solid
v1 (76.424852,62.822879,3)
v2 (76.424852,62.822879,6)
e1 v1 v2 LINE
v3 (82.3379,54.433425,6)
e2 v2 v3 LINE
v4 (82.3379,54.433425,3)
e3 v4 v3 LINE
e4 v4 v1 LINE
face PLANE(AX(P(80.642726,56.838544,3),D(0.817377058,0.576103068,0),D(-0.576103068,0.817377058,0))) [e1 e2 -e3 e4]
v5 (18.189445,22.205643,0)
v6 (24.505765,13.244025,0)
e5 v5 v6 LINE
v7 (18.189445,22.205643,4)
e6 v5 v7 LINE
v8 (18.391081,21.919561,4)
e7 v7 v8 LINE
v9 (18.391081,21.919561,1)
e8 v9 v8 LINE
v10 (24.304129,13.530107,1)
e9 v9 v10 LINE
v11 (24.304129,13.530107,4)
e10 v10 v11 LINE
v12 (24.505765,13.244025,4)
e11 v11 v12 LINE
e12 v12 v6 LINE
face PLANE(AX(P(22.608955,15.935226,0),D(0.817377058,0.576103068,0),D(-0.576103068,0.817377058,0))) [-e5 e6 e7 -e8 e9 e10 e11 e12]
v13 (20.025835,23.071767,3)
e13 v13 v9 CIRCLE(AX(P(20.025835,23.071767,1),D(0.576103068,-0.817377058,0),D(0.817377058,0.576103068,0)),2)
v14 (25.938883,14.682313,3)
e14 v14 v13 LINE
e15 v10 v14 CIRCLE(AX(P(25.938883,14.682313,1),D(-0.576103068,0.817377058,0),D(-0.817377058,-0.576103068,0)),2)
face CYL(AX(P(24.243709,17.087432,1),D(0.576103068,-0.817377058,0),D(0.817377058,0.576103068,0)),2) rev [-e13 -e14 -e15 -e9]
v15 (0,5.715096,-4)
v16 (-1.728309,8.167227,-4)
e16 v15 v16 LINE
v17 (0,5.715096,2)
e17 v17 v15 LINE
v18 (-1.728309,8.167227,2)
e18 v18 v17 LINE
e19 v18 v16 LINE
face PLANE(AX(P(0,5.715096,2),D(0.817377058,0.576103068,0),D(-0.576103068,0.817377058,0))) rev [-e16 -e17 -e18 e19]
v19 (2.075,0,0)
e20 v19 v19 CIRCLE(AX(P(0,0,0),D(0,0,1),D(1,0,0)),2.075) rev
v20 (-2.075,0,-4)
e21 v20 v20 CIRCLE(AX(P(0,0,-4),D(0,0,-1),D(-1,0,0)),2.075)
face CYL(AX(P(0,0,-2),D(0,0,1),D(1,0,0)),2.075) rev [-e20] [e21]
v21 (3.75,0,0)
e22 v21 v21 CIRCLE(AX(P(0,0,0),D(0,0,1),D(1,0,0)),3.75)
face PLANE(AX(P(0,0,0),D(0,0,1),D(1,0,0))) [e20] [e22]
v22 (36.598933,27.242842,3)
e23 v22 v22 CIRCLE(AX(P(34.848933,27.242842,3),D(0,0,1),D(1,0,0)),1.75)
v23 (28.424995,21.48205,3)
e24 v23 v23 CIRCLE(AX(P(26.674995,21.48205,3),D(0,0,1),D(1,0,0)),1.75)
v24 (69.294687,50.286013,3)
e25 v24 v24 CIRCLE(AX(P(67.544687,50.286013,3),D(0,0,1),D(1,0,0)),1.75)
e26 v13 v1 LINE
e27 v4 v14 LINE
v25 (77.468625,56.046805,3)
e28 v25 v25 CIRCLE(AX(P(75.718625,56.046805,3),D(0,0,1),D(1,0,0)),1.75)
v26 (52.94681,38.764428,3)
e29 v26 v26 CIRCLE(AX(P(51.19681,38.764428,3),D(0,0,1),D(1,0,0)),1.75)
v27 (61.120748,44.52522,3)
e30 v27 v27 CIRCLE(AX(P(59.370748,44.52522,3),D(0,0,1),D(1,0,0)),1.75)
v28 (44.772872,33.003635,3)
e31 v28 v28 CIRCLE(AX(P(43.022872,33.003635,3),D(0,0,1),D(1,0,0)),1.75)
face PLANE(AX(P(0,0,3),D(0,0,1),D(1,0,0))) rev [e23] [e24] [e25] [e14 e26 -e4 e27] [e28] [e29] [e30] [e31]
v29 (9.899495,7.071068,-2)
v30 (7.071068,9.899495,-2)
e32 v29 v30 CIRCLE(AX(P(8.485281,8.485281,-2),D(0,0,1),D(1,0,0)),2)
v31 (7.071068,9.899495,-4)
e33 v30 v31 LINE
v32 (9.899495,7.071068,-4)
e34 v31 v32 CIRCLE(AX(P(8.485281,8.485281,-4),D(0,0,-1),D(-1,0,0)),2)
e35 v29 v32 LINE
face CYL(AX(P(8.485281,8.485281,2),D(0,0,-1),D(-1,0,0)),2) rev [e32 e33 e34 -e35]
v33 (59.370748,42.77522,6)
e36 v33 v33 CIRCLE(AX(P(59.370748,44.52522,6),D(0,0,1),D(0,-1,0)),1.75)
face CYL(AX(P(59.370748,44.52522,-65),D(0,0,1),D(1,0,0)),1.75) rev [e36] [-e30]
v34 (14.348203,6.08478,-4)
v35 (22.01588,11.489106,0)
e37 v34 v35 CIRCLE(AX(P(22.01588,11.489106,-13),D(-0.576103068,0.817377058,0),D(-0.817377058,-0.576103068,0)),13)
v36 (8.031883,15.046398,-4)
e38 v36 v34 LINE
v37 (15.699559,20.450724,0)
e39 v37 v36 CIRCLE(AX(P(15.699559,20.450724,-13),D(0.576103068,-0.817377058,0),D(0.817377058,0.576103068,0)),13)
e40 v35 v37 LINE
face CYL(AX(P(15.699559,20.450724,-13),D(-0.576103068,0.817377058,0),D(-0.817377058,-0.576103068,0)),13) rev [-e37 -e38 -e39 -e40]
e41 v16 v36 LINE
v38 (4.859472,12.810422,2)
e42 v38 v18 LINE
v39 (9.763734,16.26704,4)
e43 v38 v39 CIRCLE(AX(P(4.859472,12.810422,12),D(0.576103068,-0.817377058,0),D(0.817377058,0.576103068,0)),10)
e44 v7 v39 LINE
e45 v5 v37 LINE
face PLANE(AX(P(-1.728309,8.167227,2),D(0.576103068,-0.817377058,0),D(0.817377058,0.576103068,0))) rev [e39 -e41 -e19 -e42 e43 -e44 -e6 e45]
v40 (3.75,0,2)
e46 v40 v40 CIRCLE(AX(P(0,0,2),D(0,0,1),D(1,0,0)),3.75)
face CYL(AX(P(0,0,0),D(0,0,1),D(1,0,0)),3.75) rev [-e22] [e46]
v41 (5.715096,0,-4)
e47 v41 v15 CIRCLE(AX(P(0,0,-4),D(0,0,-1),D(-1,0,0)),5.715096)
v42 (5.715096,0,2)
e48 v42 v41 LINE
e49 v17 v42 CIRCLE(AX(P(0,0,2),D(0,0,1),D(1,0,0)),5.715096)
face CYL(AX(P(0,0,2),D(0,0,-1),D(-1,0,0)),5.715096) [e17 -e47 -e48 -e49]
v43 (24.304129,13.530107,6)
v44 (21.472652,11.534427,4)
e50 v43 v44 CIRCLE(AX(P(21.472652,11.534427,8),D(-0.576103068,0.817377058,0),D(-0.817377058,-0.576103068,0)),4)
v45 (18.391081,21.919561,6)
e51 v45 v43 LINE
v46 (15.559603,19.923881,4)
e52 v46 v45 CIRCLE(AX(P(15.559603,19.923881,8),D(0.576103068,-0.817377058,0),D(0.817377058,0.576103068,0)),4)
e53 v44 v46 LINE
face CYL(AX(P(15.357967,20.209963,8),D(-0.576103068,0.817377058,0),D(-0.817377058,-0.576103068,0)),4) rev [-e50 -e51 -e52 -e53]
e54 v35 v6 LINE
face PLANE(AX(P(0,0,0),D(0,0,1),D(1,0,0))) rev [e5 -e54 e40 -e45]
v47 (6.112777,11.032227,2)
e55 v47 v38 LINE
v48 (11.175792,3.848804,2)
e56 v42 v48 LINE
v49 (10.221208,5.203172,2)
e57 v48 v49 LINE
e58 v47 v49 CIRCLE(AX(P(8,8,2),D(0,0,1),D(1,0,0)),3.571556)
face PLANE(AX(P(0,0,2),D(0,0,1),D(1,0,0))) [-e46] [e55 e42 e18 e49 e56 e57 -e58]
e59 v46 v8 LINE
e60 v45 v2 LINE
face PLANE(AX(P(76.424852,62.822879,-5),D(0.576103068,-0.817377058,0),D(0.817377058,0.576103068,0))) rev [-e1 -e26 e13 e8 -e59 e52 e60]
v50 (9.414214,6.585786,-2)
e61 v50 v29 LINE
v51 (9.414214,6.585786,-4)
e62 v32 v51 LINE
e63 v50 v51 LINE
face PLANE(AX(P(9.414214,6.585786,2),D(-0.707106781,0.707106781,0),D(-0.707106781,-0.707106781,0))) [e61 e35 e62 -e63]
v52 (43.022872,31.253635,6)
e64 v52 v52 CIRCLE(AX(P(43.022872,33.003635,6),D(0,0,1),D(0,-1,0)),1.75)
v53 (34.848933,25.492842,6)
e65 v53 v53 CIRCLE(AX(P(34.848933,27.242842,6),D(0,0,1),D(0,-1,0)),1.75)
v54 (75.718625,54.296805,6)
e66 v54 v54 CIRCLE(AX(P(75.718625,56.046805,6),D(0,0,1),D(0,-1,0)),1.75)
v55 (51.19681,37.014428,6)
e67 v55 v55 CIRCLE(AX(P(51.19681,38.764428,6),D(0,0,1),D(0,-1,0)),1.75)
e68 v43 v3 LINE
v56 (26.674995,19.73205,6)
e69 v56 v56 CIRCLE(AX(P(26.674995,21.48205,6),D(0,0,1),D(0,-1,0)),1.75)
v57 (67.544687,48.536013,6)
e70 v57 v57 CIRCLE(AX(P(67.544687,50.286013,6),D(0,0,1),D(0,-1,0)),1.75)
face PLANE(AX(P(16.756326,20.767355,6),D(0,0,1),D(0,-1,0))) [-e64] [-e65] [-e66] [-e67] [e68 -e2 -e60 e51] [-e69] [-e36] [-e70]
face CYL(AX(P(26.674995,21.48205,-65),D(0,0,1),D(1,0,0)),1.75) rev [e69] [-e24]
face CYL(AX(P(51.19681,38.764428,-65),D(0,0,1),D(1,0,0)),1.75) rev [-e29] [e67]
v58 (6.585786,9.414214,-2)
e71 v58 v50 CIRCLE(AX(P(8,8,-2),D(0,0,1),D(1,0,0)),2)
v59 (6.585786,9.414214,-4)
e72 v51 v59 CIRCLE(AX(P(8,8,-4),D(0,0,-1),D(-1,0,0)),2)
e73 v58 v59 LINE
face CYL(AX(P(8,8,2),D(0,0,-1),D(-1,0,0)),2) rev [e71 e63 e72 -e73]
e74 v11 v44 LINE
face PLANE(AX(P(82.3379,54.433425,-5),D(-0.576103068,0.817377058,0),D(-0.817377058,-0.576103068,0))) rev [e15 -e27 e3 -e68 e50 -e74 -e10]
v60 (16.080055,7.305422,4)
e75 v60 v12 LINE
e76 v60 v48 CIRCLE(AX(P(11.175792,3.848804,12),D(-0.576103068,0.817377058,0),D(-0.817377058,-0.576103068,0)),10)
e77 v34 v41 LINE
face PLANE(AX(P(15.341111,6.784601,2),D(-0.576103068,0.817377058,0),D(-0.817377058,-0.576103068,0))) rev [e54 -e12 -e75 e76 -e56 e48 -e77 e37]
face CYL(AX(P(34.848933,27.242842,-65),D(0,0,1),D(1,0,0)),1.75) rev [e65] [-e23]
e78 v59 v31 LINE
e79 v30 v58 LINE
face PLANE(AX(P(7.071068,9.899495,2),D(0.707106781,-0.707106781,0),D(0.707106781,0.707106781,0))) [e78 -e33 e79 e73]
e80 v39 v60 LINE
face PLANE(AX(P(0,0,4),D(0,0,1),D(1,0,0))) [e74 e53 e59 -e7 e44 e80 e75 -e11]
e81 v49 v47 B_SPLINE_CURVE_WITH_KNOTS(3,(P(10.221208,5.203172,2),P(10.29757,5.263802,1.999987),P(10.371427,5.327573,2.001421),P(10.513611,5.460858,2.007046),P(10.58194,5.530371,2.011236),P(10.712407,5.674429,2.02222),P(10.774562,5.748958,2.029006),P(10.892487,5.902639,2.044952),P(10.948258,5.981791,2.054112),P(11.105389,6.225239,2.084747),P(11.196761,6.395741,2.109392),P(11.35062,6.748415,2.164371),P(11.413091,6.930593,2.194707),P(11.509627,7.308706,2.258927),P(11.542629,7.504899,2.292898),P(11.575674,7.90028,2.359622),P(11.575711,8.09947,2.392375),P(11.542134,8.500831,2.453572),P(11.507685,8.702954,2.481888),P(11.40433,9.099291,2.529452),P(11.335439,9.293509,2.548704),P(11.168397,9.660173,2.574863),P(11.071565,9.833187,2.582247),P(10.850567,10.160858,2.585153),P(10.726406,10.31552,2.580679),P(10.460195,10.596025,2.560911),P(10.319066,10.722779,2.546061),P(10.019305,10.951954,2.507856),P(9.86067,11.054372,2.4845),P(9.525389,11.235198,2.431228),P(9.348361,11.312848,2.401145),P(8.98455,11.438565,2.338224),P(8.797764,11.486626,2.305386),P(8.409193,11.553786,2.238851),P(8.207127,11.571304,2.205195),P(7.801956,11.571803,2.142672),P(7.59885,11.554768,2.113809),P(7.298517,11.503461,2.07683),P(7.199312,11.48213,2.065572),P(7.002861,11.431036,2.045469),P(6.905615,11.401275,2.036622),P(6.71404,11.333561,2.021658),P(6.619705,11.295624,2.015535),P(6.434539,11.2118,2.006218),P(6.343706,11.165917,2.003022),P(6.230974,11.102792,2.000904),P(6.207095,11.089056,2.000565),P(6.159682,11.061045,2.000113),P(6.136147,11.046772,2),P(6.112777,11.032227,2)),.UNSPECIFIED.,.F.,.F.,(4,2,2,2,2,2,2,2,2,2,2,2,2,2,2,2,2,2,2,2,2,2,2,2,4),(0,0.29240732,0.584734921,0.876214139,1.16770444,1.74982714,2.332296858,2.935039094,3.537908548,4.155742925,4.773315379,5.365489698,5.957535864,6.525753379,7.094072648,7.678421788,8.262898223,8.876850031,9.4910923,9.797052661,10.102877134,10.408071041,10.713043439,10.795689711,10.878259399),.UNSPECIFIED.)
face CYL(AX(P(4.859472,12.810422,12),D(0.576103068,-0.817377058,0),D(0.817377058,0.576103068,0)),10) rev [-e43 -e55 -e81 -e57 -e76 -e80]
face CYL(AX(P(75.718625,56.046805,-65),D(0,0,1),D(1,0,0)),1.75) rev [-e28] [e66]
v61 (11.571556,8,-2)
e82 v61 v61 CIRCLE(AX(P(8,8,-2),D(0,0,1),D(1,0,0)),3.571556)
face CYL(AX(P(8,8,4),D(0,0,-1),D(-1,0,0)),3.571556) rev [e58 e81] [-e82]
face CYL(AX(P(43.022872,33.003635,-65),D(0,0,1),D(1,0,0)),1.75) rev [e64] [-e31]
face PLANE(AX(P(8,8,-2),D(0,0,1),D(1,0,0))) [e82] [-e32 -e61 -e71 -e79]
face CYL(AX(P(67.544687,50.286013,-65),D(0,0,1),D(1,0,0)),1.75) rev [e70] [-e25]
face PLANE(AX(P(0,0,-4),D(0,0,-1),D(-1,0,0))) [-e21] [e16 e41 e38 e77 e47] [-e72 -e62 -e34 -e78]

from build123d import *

# Parameters (mm, degrees)
SKETCH_1_R                     = 2.1
EXTRUDE_1_DEPTH                = 2
EXTRUDE_2_DEPTH                = 40
EXTRUDE_3_DEPTH                = 2
EXTRUDE_START                  = -4
SKETCH_10_R                    = 2.075
EXTRUDE_4_DEPTH                = 4
SKETCH_14_R                    = 3.5715559825460215
CUT_EXTRUDE_6_DEPTH            = 4
EXTRUDE_5_DEPTH                = 2
EXTRUDE_START_2                = 2
SKETCH_19_R                    = 2.075
EXTRUDE_6_DEPTH                = 2
CUT_EXTRUDE_START              = -2
SKETCH_22_R                    = 3.5715559825460206
CUT_EXTRUDE_11_DEPTH           = 2
SKETCH_23_R                    = 3.75
CUT_EXTRUDE_12_DEPTH           = 2
FILLET_5_R                     = 13
FILLET_6_R                     = 10
CUT_EXTRUDE_13_DEPTH           = 28.999999999999996
CUT_EXTRUDE_14_DEPTH           = 12.999999999999984
SKETCH_29_R                    = 3.0000000000000084
SKETCH_29_R_2                  = 3.0000000000000018
SKETCH_29_R_3                  = 1.2000000000000004
EXTRUDE_8_DEPTH                = 13
CUT_EXTRUDE_15_DEPTH           = 13
M3X0_5_1_D                     = 2.8
FILLET_8_R                     = 5
EXTRUDE_9_DEPTH                = 1.9999999999999991
EXTRUDE_10_DEPTH               = 4.5
EXTRUDE_11_DEPTH               = 0.5
FILLET_9_R                     = 0.5
CUT_EXTRUDE_16_DEPTH           = 9.500000000000002
EXTRUDE_12_DEPTH               = 2
CUT_EXTRUDE_17_DEPTH           = 50.00000000000002
SKETCH_42_W                    = 39.21300819263915
SKETCH_42_H                    = 42.57339221101679
CUT_EXTRUDE_19_DEPTH           = 50.00000000000002
SKETCH_44_W                    = 3.999999999999999
SKETCH_44_H                    = 10.963872604458988
EXTRUDE_13_DEPTH               = 60.00000000000003
SKETCH_45_W                    = 1.9999999999999996
SKETCH_45_H                    = 10.963872604458988
CUT_EXTRUDE_20_DEPTH           = 73.00000000000004
SKETCH_46_R                    = 1.7500000000000004
SKETCH_46_R_2                  = 1.7500000000000038
SKETCH_46_R_3                  = 1.749999999999997
SKETCH_46_R_4                  = 1.7500000000000104
CUT_EXTRUDE_21_DEPTH           = 70.00000000000003
SKETCH_47_W                    = 1.9999999999999996
SKETCH_47_H                    = 10.963872604458988
CUT_EXTRUDE_22_DEPTH           = 1.9999999999999967
CUT_EXTRUDE_23_DEPTH           = 10
EXTRUDE_16_DEPTH               = 73.00000000000003
SKETCH_52_R                    = 1.7500000000000104
SKETCH_52_R_2                  = 1.749999999999997
SKETCH_52_R_3                  = 1.7500000000000038
SKETCH_52_R_4                  = 1.7500000000000004
CUT_EXTRUDE_24_DEPTH           = 73.00000000000003
SPLIT_BODIES_1_SURFACE_1_BACK  = 112.869
SPLIT_BODIES_1_SURFACE_1_DEPTH = 225.738
SPLIT_BODIES_1_SURFACE_2_BACK  = 112.869
SPLIT_BODIES_1_SURFACE_2_DEPTH = 225.738
FILLET_11_R                    = 2
FILLET_12_R                    = 4


# Read off the part's stored shape, not the designer's step: 实体-删除/保留 1
with BuildPart() as part:
    # 草图1 → 凸台-拉伸1 (new body)
    with BuildSketch(Plane.XY):
        with BuildLine():
            Line((5.715095935783956, 0), (15.341111112939824, 6.784600591097247))
            Line((15.341111112939824, 6.784600591097247), (42.49706355926069, 25.92463804463833))
            Line((42.49706355926069, 25.92463804463833), (52.86691877711603, 11.211850995247643))
            Line((52.86691877711603, 11.211850995247643), (93.73577169209018, 40.017004378179195))
            Line((93.73577169209018, 40.017004378179195), (42.483411773869754, 112.7340328625418))
            Line((42.483411773869754, 112.7340328625418), (1.6145588588956372, 83.92887947961026))
            Line((1.6145588588956372, 83.92887947961026), (36.18074291841349, 34.88625598164134))
            Line((36.18074291841349, 34.88625598164134), (-1.7283092029758853, 8.167227110682408))
            Line((-1.7283092029758853, 8.167227110682408), (0, 5.715095935783956))
            ThreePointArc((0, 5.715095935783956), (-4.0411830913245135, -4.041183091324513), (5.715095935783956, 0))
        make_face()
        Circle(SKETCH_1_R, mode=Mode.SUBTRACT)
        with BuildLine():
            Line((7.071067811864017, 9.899494936610912), (6.585786437625429, 9.414213562372302))
            ThreePointArc((6.585786437625429, 9.414213562372302), (6.585786437625458, 6.585786437626118), (9.41421356237164, 6.58578643762615))
            Line((9.41421356237164, 6.58578643762615), (9.899494936610207, 7.071067811864724))
            ThreePointArc((9.899494936610207, 7.071067811864724), (9.899494936610207, 9.899494936610912), (7.071067811864017, 9.899494936610912))
        make_face(mode=Mode.SUBTRACT)
    extrude(amount=EXTRUDE_1_DEPTH)

    # 草图2 → 凸台-拉伸2 (add)
    with BuildSketch(Plane.XY.offset(2)):
        Polygon((2.4787134603835828, 82.70281389216105), (42.12150078790845, 110.64381267360466), (91.64555150315304, 40.37891536414052), (52.00276417562808, 12.43791658269687), (52.86691877711603, 11.211850995247648), (93.73577169209018, 40.017004378179195), (42.483411773869754, 112.7340328625418), (1.6145588588956372, 83.92887947961026), align=None)
    extrude(amount=EXTRUDE_2_DEPTH)

    # 草图4 → 凸台-拉伸3 (add)
    with BuildSketch(Plane.XY.offset(42)):
        Polygon((93.73577169209018, 40.017004378179195), (52.86691877711603, 11.211850995247648), (1.6145588588956372, 83.92887947961026), (42.483411773869754, 112.7340328625418), align=None)
    extrude(amount=EXTRUDE_3_DEPTH)

    # 草图10 → 凸台-拉伸4 (add)
    with BuildSketch(Plane.XY.offset(2).offset(EXTRUDE_START)):
        with BuildLine():
            Line((8.031882820422537, 15.046398123036559), (14.348203461269724, 6.084780186033628))
            Line((14.348203461269724, 6.084780186033628), (5.715095935783956, 0))
            ThreePointArc((5.715095935783956, 0), (-4.0411830913245135, -4.041183091324513), (0, 5.715095935783956))
            Line((0, 5.715095935783956), (-1.7283092029758853, 8.167227110682408))
            Line((-1.7283092029758853, 8.167227110682408), (8.031882820422537, 15.046398123036559))
        make_face()
        Circle(SKETCH_10_R, mode=Mode.SUBTRACT)
        with BuildLine():
            Line((7.071067811864017, 9.899494936610912), (6.58578643762543, 9.4142135623723))
            ThreePointArc((6.58578643762543, 9.4142135623723), (6.585786437625461, 6.585786437626118), (9.414213562371643, 6.58578643762615))
            Line((9.414213562371643, 6.58578643762615), (9.899494936610205, 7.071067811864723))
            ThreePointArc((9.899494936610205, 7.071067811864723), (9.899494936610207, 9.899494936610912), (7.071067811864017, 9.899494936610912))
        make_face(mode=Mode.SUBTRACT)
    extrude(amount=EXTRUDE_4_DEPTH)

    # 草图14 → 切除-拉伸6 (cut)
    with BuildSketch(Plane(origin=(0, 0, 0), x_dir=(-1, 0, 0), z_dir=(0, 0, -1))):
        with Locations((-7.999999999998536, 7.999999999999225)):
            Circle(SKETCH_14_R)
    extrude(amount=-CUT_EXTRUDE_6_DEPTH, mode=Mode.SUBTRACT)

    # 草图17 → 凸台-拉伸5 (add)
    with BuildSketch(Plane.XY.offset(2)):
        Polygon((9.763733946874806, 16.267040097932394), (16.080054587722028, 7.305422160929461), (83.36591647423481, 54.72979142756991), (77.0495958333876, 63.691409364572834), align=None)
    extrude(amount=EXTRUDE_5_DEPTH)

    # 草图19 → 凸台-拉伸6 (add)
    with BuildSketch(Plane(origin=(0, 0, -2), x_dir=(-1, 0, 0), z_dir=(0, 0, -1)).offset(EXTRUDE_START_2)):
        with BuildLine():
            Line((1.7283092029758853, 8.167227110682408), (-8.031882820422537, 15.046398123036559))
            Line((-8.031882820422537, 15.046398123036559), (-14.348203461269724, 6.084780186033628))
            Line((-14.348203461269724, 6.084780186033628), (-5.715095935783956, 0))
            ThreePointArc((-5.715095935783956, 0), (4.041183091324512, -4.0411830913245135), (3.5e-16, 5.715095935783956))
            Line((3.5e-16, 5.715095935783956), (1.7283092029758853, 8.167227110682408))
        make_face()
        with Locations(Location((0, 0, 0), (0, 0, 180))):
            Circle(SKETCH_19_R, mode=Mode.SUBTRACT)
        with BuildLine():
            Line((-9.414213562371643, 6.58578643762615), (-9.899494936610205, 7.071067811864723))
            ThreePointArc((-9.899494936610205, 7.071067811864723), (-9.899494936610207, 9.899494936610914), (-7.071067811864017, 9.899494936610912))
            Line((-7.071067811864017, 9.899494936610912), (-6.58578643762543, 9.4142135623723))
            ThreePointArc((-6.58578643762543, 9.4142135623723), (-6.585786437625462, 6.585786437626118), (-9.414213562371643, 6.58578643762615))
        make_face(mode=Mode.SUBTRACT)
    extrude(amount=-EXTRUDE_6_DEPTH)

    # 草图22 → 切除-拉伸11 (cut)
    with BuildSketch(Plane.XY.offset(CUT_EXTRUDE_START)):
        with Locations((7.999999999998536, 7.999999999999225)):
            Circle(SKETCH_22_R)
    extrude(amount=CUT_EXTRUDE_11_DEPTH, mode=Mode.SUBTRACT)

    # 草图23 → 切除-拉伸12 (cut)
    with BuildSketch(Plane.XY.offset(2)):
        Circle(SKETCH_23_R)
    extrude(amount=-CUT_EXTRUDE_12_DEPTH, mode=Mode.SUBTRACT)

    # 圆角5
    # the kernel refuses this fillet: 13 mm, written as the material it adds along each edge
    with BuildSketch(Plane(origin=(14.348203461269723, 6.084780186033624, 2.2e-16), x_dir=(8e-16, 5.7e-16, -1), z_dir=(-0.5761030676586291, 0.8173770582994835, 0))) as fillet_5_piece_1:
        with BuildLine():
            CenterArc((13.000000000000009, -9.38083151964685), FILLET_5_R, 133.81306146040322, 46.18693853959684)
            Line((9.43e-15, -9.380831519646863), (-0.25999999999999057, -9.380831519646863))
            Line((-0.25999999999999057, -9.380831519646863), (-0.26, 3.4e-16))
            Line((-0.26, 3.4e-16), (-2.6e-16, 0.26000000000000023))
            ThreePointArc((-2.6e-16, 0.26000000000000023), (1.9999999999999998, 0.2599999999999987), (3.8200000000000003, 0.1876166303929368))
            Line((3.8200000000000003, 0.1876166303929368), (4, 0))
        make_face()
    extrude(amount=10.963872604458924)

    # 圆角6
    # the kernel refuses this fillet: 10 mm, written as the material it adds along each edge
    with BuildSketch(Plane(origin=(9.763733946874806, 16.267040097932394, 2), x_dir=(-0.8173770582994822, -0.5761030676586308, 0), z_dir=(0.576103067658631, -0.8173770582994822, 0))) as fillet_6_piece_1_section:
        with BuildLine():
            CenterArc((6.000000000000636, -10.000000000000002), FILLET_6_R, 90, 36.86989764584695)
            Line((2.2818e-13, -2.000000000000304), (-0.11999999999977938, -1.8400000000003103))
            ThreePointArc((-0.11999999999977938, -1.8400000000003103), (-0.20000000000000048, -1.000000000000152), (-0.20000000000000048, 0))
            Line((-0.20000000000000048, 0), (-1.45e-15, 0.2))
            Line((-1.45e-15, 0.2), (6.000000000000636, 0.2))
            Line((6.000000000000636, 0.2), (6.000000000000636, 0))
        make_face()
    fillet_6_piece_1 = extrude(amount=10.963872604458947, mode=Mode.PRIVATE)
    fillet_6_piece_1 = fillet_6_piece_1 - Plane(origin=(7.999999999998536, 7.999999999999225, 2), x_dir=(-1, 0, 0), z_dir=(0, 0, -1)) * Cylinder(3.5715559825460215, 46, mode=Mode.PRIVATE)
    add(fillet_6_piece_1)

    # 草图24 → 切除-拉伸13 (cut)
    with BuildSketch(Plane.XY.offset(44.00000000000001)):
        Polygon((1.6145588588956372, 83.92887947961026), (42.483411773869754, 112.7340328625418), (93.73577169209018, 40.017004378179195), (52.86691877711603, 11.211850995247648), (2.4787134603835828, 82.70281389216105), align=None)
    extrude(amount=-CUT_EXTRUDE_13_DEPTH, mode=Mode.SUBTRACT)

    # 草图25 → 切除-拉伸14 (cut)
    with BuildSketch(Plane.XY.offset(15.000000000000007)):
        Polygon((2.4787134603835828, 82.70281389216105), (1.6145588588956372, 83.92887947961026), (42.48341177386975, 112.7340328625418), (93.73577169209018, 40.017004378179195), (52.86691877711603, 11.211850995247648), (52.00276417562802, 12.437916582696838), (91.64555150315304, 40.37891536414052), (42.12150078790842, 110.64381267360463), align=None)
    extrude(amount=-CUT_EXTRUDE_14_DEPTH, mode=Mode.SUBTRACT)

    # 草图29 → 凸台-拉伸8 (add)
    with BuildSketch(Plane.XY.offset(2)):
        with Locations(Location((86.76837106229962, 41.223374331383454, 0), (0, 0, 180))):
            Circle(SKETCH_29_R)
        with Locations(Location((51.2228117877621, 91.65553882846152, 0), (0, 0, 180))):
            Circle(SKETCH_29_R_2)
        with Locations(Location((35.247091362615166, 45.46860572527032, 0), (0, 0, 180))):
            Circle(SKETCH_29_R_3)
    extrude(amount=EXTRUDE_8_DEPTH)

    # 草图30 → 切除-拉伸15 (cut)
    with BuildSketch(Plane.XY.offset(2)):
        Polygon((1.6145588588956372, 83.92887947961026), (42.48341177386975, 112.7340328625418), (53.29333634245431, 97.39687387080285), (12.424483427480185, 68.59172048787134), align=None)
    extrude(amount=-CUT_EXTRUDE_15_DEPTH, mode=Mode.SUBTRACT)

    # M3x0.5 螺纹孔1 (through all)
    with Locations(Plane.XY.offset(15)):
        with Locations((51.222811788, 91.655538828), (86.768371062, 41.223374331)):
            Hole(M3X0_5_1_D / 2)

    # 圆角8
    # the kernel refuses this fillet: 5 mm, written as the material it takes off along each edge
    with BuildSketch(Plane(origin=(52.86691877711603, 11.21185099524764, -12.500000000000018), x_dir=(-0.57610306765863, 0.8173770582994827, 0), z_dir=(0, 1.2e-16, 1))) as fillet_8_piece_1:
        with BuildLine():
            CenterArc((FILLET_8_R, -FILLET_8_R), FILLET_8_R, 90.00000000000001, 90.00000000000011)
            Line((4.76e-15, -FILLET_8_R), (0, 0))
            Line((0, 0), (FILLET_8_R, 1e-17))
        make_face()
    extrude(amount=27.000000000000057, mode=Mode.SUBTRACT)
    with BuildSketch(Plane(origin=(93.73577169209018, 40.017004378179195, -12.499999999999993), x_dir=(-0.8173770582994824, -0.5761030676586305, 0), z_dir=(0, 0, 1))) as fillet_8_piece_2:
        with BuildLine():
            CenterArc((FILLET_8_R, -FILLET_8_R), FILLET_8_R, 90, 90)
            Line((-5.2e-16, -FILLET_8_R), (0, 0))
            Line((0, 0), (FILLET_8_R, -2.3e-16))
        make_face()
    extrude(amount=27.000000000000007, mode=Mode.SUBTRACT)
    with BuildSketch(Plane(origin=(12.424483427480185, 68.59172048787134, 14.499999999999991), x_dir=(0.5761030676586302, -0.8173770582994826, 0), z_dir=(0, 0, -1))) as fillet_8_piece_3:
        with BuildLine():
            CenterArc((FILLET_8_R, -FILLET_8_R), FILLET_8_R, 90, 89.99999999999989)
            Line((-6.63e-15, -FILLET_8_R), (0, 0))
            Line((0, 0), (FILLET_8_R, -4e-16))
        make_face()
    extrude(amount=26.999999999999982, mode=Mode.SUBTRACT)
    with BuildSketch(Plane(origin=(53.29333634245431, 97.39687387080285, 14.499999999999993), x_dir=(-0.8173770582994824, -0.5761030676586305, 0), z_dir=(0, 0, -1))) as fillet_8_piece_4:
        with BuildLine():
            CenterArc((FILLET_8_R, -FILLET_8_R), FILLET_8_R, 90, 90)
            Line((5.2e-16, -FILLET_8_R), (0, 0))
            Line((0, 0), (FILLET_8_R, 2.3e-16))
        make_face()
    extrude(amount=26.999999999999986, mode=Mode.SUBTRACT)

    # 草图35 → 凸台-拉伸9 (add)
    with BuildSketch(Plane.XY.offset(2)):
        Polygon((83.9272469924964, 33.10376756627563), (63.492820535009336, 18.701190874809864), (72.1343665498888, 6.440535000317625), (92.56879300737585, 20.843111691783392), align=None)
    extrude(amount=-EXTRUDE_9_DEPTH)

    # 草图36 → 凸台-拉伸10 (add)
    with BuildSketch(Plane.XY.offset(2)):
        Polygon((83.9272469924964, 33.10376756627563), (88.65129214729717, 26.401275688219865), (87.69528224340063, 25.727461525276922), (84.0082226103854, 30.95867469839361), (64.52980605679488, 17.2299121698708), (63.49282053500935, 18.70119087480987), align=None)
        Polygon((72.1343665498888, 6.440535000317625), (92.56879300737585, 20.843111691783392), (91.5318074855903, 22.31439039672246), (71.09738102810324, 7.911813705256714), align=None)
    extrude(amount=EXTRUDE_10_DEPTH)

    # 草图38 → 凸台-拉伸11 (add)
    with BuildSketch(Plane.XY.offset(6.5)):
        Polygon((71.20701372358899, 21.936136526395817), (79.77043226489411, 27.97179857636138), (80.48699168922953, 26.955141545284572), (71.92357314792442, 20.919479495319017), align=None)
        Polygon((86.2422183193346, 18.586186241257604), (77.41533643660377, 12.36483016223927), (76.64618005583336, 13.456111940066782), (85.47306193856419, 19.677468019085115), align=None)
    extrude(amount=-EXTRUDE_11_DEPTH)

    # 圆角9
    fillet_9_edges = [part.edges().sort_by_distance(p)[0] for p in [
        (75.48872299424156, 24.953967551378597, 6),
        (81.82877737796917, 15.475508201748436, 6),
    ]]
    fillet(fillet_9_edges, radius=FILLET_9_R)

    # 草图40 → 切除-拉伸16 (cut)
    with BuildSketch(Plane.XY.offset(2)):
        Polygon((65.96583570106971, 15.192468260678279), (69.64530996532923, 9.972017235426623), (86.89967078383748, 22.133222516514135), (83.22019651957794, 27.353673541765804), align=None)
        Polygon((79.13062239501116, 33.15597569096527), (85.72890544742685, 37.806572461671124), (80.1765478028438, 45.68427701304691), (50.06316674834756, 24.459787009423422), (55.61552439293061, 16.582082458047644), align=None)
        Polygon((39.25145299063004, 45.68427701304691), (67.37307339397086, 65.5049358110826), (63.37371277016225, 71.17924272816451), (35.25209236682142, 51.35858393012882), align=None)
        Polygon((30.685761748669528, 51.952517364922464), (63.37371277016222, 74.99161378651206), (59.82181706782164, 80.03105589947442), (27.133866046328958, 56.99195947788482), align=None)
        Polygon((26.06105069463626, 58.51407367149419), (23.152992111790248, 62.64003741522087), (55.84094313328293, 85.6791338368105), (58.74900171612895, 81.55317009308379), align=None)
        Polygon((21.894829409934886, 64.42512308102752), (19.378576670767988, 67.99519131593051), (49.49195772526422, 89.2196813195541), (51.98740367066816, 85.6791338368105), align=None)
    extrude(amount=-CUT_EXTRUDE_16_DEPTH, mode=Mode.SUBTRACT)

    # 草图41 → 凸台-拉伸12 (add)
    with BuildSketch(Plane.XY.offset(2)):
        Polygon((69.64530996532923, 9.972017235426623), (65.96583570106971, 15.192468260678279), (66.98240526122602, 15.908966033827006), (70.66187952548556, 10.688515008575354), align=None)
    extrude(amount=-EXTRUDE_12_DEPTH)

    # 草图3 → 切除-拉伸17 (cut)
    with BuildSketch(Plane.XY.offset(42)):
        Polygon((1.6145588588956372, 83.92887947961026), (52.86691877711603, 11.211850995247648), (93.73577169209018, 40.017004378179195), (42.48341177386975, 112.7340328625418), align=None)
    extrude(amount=-CUT_EXTRUDE_17_DEPTH, mode=Mode.SUBTRACT)


with BuildPart() as cut_extrude_17_piece_1:
    # of the separate pieces the step leaves, piece 1, a body of its own (cut_extrude_17_pieces)
    add(part.part.solids().sort_by_distance((22.015879933, 11.489106002, 0))[0])


with BuildPart() as cut_extrude_17_piece_2:
    # of the separate pieces the step leaves, piece 2, a body of its own (cut_extrude_17_pieces)
    add(part.part.solids().sort_by_distance((71.207013724, 21.936136526, 5.5))[0])


with BuildPart() as cut_extrude_19_tool:
    # 草图42 → 切除-拉伸19 (new body)
    with BuildSketch(Plane.XY.offset(6.5)):
        Polygon((28.815346269643545, 29.694982797748935), (35.13166691049081, 20.73336486074598), (48.41112186379118, 17.53375132498441), (30.419712241827142, 43.06002656463614), align=None)
        with Locations((76.58542458379063, 21.286696105508394)):
            Rectangle(SKETCH_42_W, SKETCH_42_H)
    extrude(amount=-CUT_EXTRUDE_19_DEPTH)


with BuildPart() as cut_extrude_17_piece_1_1:
    add(cut_extrude_17_piece_1.part)

    # 切除-拉伸19: cut by cut_extrude_19_tool
    add(cut_extrude_19_tool.part, mode=Mode.SUBTRACT)

    # 草图44 → 凸台-拉伸13 (add)
    with BuildSketch(Plane(origin=(33.234856604715326, 23.424565992842005, 0), x_dir=(0, 0, -1), z_dir=(0.817377058299481, 0.5761030676586324, 0))):
        with Locations((-1.9999999999999996, 2.18945200166085)):
            Rectangle(SKETCH_44_W, SKETCH_44_H)
    extrude(amount=EXTRUDE_13_DEPTH)

    # 草图45 → 切除-拉伸20 (cut)
    with BuildSketch(Plane(origin=(82.27748010268421, 57.990750052359964, 0), x_dir=(0, 0, -1), z_dir=(0.817377058299481, 0.5761030676586324, 0))):
        with Locations((-2.999999999999999, 2.18945200166085)):
            Rectangle(SKETCH_45_W, SKETCH_45_H)
    extrude(amount=-CUT_EXTRUDE_20_DEPTH, mode=Mode.SUBTRACT)

    # 草图46 → 切除-拉伸21 (cut)
    with BuildSketch(Plane.XY.offset(1.9999999999999996)):
        with Locations((26.674994885127283, 21.482049818624887)):
            Circle(SKETCH_46_R)
        with Locations((34.848933258484564, 27.242842426292455)):
            Circle(SKETCH_46_R_2)
        with Locations((43.022871631841845, 33.003635033960016)):
            Circle(SKETCH_46_R_2)
        with Locations((51.19681000519913, 38.76442764162759)):
            Circle(SKETCH_46_R_3)
        with Locations((59.370748378556414, 44.52522024929516)):
            Circle(SKETCH_46_R_3)
        with Locations((67.5446867519137, 50.28601285696273)):
            Circle(SKETCH_46_R_4)
        with Locations((75.71862512527099, 56.04680546463029)):
            Circle(SKETCH_46_R_4)
    extrude(amount=-CUT_EXTRUDE_21_DEPTH, mode=Mode.SUBTRACT)

    # 草图47 → 切除-拉伸22 (cut)
    with BuildSketch(Plane(origin=(82.27748010268421, 57.990750052359964, 0), x_dir=(0, 0, -1), z_dir=(0.817377058299481, 0.5761030676586324, 0))):
        with Locations((-0.9999999999999998, 2.18945200166085)):
            Rectangle(SKETCH_47_W, SKETCH_47_H)
    extrude(amount=-CUT_EXTRUDE_22_DEPTH, mode=Mode.SUBTRACT)

    # 草图48 → 切除-拉伸23 (cut)
    with BuildSketch(Plane.XY.offset(1.9999999999999996)):
        Polygon((24.50576515259755, 13.244024981183752), (82.53953629186074, 54.14734278494668), (82.33790021818015, 54.433424755351595), (24.304129078917033, 13.530106951588571), align=None)
        Polygon((18.39108058543081, 21.9195609477819), (18.18944451175029, 22.20564291818672), (76.22321565101348, 63.10896072194963), (76.42485172469398, 62.82287875154481), align=None)
    extrude(amount=-CUT_EXTRUDE_23_DEPTH, mode=Mode.SUBTRACT)

    # 草图51 → 凸台-拉伸16 (add)
    with BuildSketch(Plane(origin=(80.64272598608528, 56.838543917042685, 0), x_dir=(0, 0, -1), z_dir=(0.8173770582994812, 0.5761030676586322, 0))):
        Polygon((-1.9999999999999996, 7.321388303890359), (-2.9999999999999996, 7.321388303890359), (-2.9999999999999982, -2.942484300568633), (-1.9999999999999982, -2.942484300568633), align=None)
    extrude(amount=-EXTRUDE_16_DEPTH)

    # 草图52 → 切除-拉伸24 (cut)
    with BuildSketch(Plane(origin=(0, 0, 0), x_dir=(-1, 0, 0), z_dir=(0, 0, -1))):
        with Locations(Location((-67.5446867519137, 50.28601285696273, 0), (0, 0, 180))):
            Circle(SKETCH_52_R)
        with Locations(Location((-75.71862512527099, 56.04680546463029, 0), (0, 0, 180))):
            Circle(SKETCH_52_R)
        with Locations(Location((-59.370748378556414, 44.52522024929516, 0), (0, 0, 180))):
            Circle(SKETCH_52_R_2)
        with Locations(Location((-51.19681000519913, 38.76442764162759, 0), (0, 0, 180))):
            Circle(SKETCH_52_R_2)
        with Locations(Location((-43.022871631841845, 33.003635033960016, 0), (0, 0, 180))):
            Circle(SKETCH_52_R_3)
        with Locations(Location((-34.848933258484564, 27.242842426292455, 0), (0, 0, 180))):
            Circle(SKETCH_52_R_3)
        with Locations(Location((-26.674994885127283, 21.482049818624887, 0), (0, 0, 180))):
            Circle(SKETCH_52_R_4)
    extrude(amount=-CUT_EXTRUDE_24_DEPTH, mode=Mode.SUBTRACT)


with BuildPart() as cut_extrude_17_piece_2_1:
    add(cut_extrude_17_piece_2.part)

    # 切除-拉伸19: cut by cut_extrude_19_tool
    add(cut_extrude_19_tool.part, mode=Mode.SUBTRACT)


with BuildPart() as body_2:
    # Split Bodies 1: the piece behind the surface
    add(cut_extrude_17_piece_1_1.part)
    # Split Bodies 1 surface: a surface, the sketch's curves swept straight by 225.738 mm
    with BuildLine(Plane.XY.offset(2.9999999999999987).offset(-SPLIT_BODIES_1_SURFACE_1_BACK), mode=Mode.PRIVATE) as split_bodies_1_surface_1_path:
        Line((18.18944451175029, 22.20564291818672), (24.50576515259755, 13.244024981183752))
    split_bodies_1_surface_1 = Shell.extrude(split_bodies_1_surface_1_path.wire(), (0 * SPLIT_BODIES_1_SURFACE_1_DEPTH, 0 * SPLIT_BODIES_1_SURFACE_1_DEPTH, 1 * SPLIT_BODIES_1_SURFACE_1_DEPTH))
    split(bisect_by=split_bodies_1_surface_1, keep=Keep.BOTTOM)


with BuildPart() as cut_extrude_17_piece_1_2:
    add(cut_extrude_17_piece_1_1.part)

    # Split Bodies 1: split by a surface, the side it looks to stays
    # Split Bodies 1 surface: a surface, the sketch's curves swept straight by 225.738 mm
    with BuildLine(Plane.XY.offset(2.9999999999999987).offset(-SPLIT_BODIES_1_SURFACE_2_BACK), mode=Mode.PRIVATE) as split_bodies_1_surface_2_path:
        Line((18.18944451175029, 22.20564291818672), (24.50576515259755, 13.244024981183752))
    split_bodies_1_surface_2 = Shell.extrude(split_bodies_1_surface_2_path.wire(), (0 * SPLIT_BODIES_1_SURFACE_2_DEPTH, 0 * SPLIT_BODIES_1_SURFACE_2_DEPTH, 1 * SPLIT_BODIES_1_SURFACE_2_DEPTH))
    split(bisect_by=split_bodies_1_surface_2, keep=Keep.TOP)


with BuildPart() as body_3:
    # Move Body 3: copy of 切除-拉伸17 piece 1
    add(cut_extrude_17_piece_1_2.part.moved(Location((0, 0, 3))))

    # Combine 1: union body 2
    add(body_2.part)

    # 圆角11
    fillet_11_edges = [body_3.edges().sort_by_distance(p)[0] for p in [
        (21.347604832173918, 17.724833949685234, 3.0000000000000147),
    ]]
    fillet(fillet_11_edges, radius=FILLET_11_R)

    # 圆角12
    # the kernel refuses this fillet: 4 mm, written as the material it adds along each edge
    with BuildSketch(Plane(origin=(24.304129078917025, 13.530106951588564, 3.999999999999999), x_dir=(-5.198e-14, -3.664e-14, 1), z_dir=(-0.5761030676586324, 0.817377058299481, 0))) as fillet_12_piece_1:
        with BuildLine():
            CenterArc((4.000000000000221, -3.4641016151376753), FILLET_12_R, 120.00000000000229, 60.000000000001364)
            Line((2.212e-13, -3.46410161513793), (0, 0))
            Line((0, 0), (2.0000000000000826, 0))
        make_face()
    extrude(amount=10.263872604458996)


solid = body_3.part
